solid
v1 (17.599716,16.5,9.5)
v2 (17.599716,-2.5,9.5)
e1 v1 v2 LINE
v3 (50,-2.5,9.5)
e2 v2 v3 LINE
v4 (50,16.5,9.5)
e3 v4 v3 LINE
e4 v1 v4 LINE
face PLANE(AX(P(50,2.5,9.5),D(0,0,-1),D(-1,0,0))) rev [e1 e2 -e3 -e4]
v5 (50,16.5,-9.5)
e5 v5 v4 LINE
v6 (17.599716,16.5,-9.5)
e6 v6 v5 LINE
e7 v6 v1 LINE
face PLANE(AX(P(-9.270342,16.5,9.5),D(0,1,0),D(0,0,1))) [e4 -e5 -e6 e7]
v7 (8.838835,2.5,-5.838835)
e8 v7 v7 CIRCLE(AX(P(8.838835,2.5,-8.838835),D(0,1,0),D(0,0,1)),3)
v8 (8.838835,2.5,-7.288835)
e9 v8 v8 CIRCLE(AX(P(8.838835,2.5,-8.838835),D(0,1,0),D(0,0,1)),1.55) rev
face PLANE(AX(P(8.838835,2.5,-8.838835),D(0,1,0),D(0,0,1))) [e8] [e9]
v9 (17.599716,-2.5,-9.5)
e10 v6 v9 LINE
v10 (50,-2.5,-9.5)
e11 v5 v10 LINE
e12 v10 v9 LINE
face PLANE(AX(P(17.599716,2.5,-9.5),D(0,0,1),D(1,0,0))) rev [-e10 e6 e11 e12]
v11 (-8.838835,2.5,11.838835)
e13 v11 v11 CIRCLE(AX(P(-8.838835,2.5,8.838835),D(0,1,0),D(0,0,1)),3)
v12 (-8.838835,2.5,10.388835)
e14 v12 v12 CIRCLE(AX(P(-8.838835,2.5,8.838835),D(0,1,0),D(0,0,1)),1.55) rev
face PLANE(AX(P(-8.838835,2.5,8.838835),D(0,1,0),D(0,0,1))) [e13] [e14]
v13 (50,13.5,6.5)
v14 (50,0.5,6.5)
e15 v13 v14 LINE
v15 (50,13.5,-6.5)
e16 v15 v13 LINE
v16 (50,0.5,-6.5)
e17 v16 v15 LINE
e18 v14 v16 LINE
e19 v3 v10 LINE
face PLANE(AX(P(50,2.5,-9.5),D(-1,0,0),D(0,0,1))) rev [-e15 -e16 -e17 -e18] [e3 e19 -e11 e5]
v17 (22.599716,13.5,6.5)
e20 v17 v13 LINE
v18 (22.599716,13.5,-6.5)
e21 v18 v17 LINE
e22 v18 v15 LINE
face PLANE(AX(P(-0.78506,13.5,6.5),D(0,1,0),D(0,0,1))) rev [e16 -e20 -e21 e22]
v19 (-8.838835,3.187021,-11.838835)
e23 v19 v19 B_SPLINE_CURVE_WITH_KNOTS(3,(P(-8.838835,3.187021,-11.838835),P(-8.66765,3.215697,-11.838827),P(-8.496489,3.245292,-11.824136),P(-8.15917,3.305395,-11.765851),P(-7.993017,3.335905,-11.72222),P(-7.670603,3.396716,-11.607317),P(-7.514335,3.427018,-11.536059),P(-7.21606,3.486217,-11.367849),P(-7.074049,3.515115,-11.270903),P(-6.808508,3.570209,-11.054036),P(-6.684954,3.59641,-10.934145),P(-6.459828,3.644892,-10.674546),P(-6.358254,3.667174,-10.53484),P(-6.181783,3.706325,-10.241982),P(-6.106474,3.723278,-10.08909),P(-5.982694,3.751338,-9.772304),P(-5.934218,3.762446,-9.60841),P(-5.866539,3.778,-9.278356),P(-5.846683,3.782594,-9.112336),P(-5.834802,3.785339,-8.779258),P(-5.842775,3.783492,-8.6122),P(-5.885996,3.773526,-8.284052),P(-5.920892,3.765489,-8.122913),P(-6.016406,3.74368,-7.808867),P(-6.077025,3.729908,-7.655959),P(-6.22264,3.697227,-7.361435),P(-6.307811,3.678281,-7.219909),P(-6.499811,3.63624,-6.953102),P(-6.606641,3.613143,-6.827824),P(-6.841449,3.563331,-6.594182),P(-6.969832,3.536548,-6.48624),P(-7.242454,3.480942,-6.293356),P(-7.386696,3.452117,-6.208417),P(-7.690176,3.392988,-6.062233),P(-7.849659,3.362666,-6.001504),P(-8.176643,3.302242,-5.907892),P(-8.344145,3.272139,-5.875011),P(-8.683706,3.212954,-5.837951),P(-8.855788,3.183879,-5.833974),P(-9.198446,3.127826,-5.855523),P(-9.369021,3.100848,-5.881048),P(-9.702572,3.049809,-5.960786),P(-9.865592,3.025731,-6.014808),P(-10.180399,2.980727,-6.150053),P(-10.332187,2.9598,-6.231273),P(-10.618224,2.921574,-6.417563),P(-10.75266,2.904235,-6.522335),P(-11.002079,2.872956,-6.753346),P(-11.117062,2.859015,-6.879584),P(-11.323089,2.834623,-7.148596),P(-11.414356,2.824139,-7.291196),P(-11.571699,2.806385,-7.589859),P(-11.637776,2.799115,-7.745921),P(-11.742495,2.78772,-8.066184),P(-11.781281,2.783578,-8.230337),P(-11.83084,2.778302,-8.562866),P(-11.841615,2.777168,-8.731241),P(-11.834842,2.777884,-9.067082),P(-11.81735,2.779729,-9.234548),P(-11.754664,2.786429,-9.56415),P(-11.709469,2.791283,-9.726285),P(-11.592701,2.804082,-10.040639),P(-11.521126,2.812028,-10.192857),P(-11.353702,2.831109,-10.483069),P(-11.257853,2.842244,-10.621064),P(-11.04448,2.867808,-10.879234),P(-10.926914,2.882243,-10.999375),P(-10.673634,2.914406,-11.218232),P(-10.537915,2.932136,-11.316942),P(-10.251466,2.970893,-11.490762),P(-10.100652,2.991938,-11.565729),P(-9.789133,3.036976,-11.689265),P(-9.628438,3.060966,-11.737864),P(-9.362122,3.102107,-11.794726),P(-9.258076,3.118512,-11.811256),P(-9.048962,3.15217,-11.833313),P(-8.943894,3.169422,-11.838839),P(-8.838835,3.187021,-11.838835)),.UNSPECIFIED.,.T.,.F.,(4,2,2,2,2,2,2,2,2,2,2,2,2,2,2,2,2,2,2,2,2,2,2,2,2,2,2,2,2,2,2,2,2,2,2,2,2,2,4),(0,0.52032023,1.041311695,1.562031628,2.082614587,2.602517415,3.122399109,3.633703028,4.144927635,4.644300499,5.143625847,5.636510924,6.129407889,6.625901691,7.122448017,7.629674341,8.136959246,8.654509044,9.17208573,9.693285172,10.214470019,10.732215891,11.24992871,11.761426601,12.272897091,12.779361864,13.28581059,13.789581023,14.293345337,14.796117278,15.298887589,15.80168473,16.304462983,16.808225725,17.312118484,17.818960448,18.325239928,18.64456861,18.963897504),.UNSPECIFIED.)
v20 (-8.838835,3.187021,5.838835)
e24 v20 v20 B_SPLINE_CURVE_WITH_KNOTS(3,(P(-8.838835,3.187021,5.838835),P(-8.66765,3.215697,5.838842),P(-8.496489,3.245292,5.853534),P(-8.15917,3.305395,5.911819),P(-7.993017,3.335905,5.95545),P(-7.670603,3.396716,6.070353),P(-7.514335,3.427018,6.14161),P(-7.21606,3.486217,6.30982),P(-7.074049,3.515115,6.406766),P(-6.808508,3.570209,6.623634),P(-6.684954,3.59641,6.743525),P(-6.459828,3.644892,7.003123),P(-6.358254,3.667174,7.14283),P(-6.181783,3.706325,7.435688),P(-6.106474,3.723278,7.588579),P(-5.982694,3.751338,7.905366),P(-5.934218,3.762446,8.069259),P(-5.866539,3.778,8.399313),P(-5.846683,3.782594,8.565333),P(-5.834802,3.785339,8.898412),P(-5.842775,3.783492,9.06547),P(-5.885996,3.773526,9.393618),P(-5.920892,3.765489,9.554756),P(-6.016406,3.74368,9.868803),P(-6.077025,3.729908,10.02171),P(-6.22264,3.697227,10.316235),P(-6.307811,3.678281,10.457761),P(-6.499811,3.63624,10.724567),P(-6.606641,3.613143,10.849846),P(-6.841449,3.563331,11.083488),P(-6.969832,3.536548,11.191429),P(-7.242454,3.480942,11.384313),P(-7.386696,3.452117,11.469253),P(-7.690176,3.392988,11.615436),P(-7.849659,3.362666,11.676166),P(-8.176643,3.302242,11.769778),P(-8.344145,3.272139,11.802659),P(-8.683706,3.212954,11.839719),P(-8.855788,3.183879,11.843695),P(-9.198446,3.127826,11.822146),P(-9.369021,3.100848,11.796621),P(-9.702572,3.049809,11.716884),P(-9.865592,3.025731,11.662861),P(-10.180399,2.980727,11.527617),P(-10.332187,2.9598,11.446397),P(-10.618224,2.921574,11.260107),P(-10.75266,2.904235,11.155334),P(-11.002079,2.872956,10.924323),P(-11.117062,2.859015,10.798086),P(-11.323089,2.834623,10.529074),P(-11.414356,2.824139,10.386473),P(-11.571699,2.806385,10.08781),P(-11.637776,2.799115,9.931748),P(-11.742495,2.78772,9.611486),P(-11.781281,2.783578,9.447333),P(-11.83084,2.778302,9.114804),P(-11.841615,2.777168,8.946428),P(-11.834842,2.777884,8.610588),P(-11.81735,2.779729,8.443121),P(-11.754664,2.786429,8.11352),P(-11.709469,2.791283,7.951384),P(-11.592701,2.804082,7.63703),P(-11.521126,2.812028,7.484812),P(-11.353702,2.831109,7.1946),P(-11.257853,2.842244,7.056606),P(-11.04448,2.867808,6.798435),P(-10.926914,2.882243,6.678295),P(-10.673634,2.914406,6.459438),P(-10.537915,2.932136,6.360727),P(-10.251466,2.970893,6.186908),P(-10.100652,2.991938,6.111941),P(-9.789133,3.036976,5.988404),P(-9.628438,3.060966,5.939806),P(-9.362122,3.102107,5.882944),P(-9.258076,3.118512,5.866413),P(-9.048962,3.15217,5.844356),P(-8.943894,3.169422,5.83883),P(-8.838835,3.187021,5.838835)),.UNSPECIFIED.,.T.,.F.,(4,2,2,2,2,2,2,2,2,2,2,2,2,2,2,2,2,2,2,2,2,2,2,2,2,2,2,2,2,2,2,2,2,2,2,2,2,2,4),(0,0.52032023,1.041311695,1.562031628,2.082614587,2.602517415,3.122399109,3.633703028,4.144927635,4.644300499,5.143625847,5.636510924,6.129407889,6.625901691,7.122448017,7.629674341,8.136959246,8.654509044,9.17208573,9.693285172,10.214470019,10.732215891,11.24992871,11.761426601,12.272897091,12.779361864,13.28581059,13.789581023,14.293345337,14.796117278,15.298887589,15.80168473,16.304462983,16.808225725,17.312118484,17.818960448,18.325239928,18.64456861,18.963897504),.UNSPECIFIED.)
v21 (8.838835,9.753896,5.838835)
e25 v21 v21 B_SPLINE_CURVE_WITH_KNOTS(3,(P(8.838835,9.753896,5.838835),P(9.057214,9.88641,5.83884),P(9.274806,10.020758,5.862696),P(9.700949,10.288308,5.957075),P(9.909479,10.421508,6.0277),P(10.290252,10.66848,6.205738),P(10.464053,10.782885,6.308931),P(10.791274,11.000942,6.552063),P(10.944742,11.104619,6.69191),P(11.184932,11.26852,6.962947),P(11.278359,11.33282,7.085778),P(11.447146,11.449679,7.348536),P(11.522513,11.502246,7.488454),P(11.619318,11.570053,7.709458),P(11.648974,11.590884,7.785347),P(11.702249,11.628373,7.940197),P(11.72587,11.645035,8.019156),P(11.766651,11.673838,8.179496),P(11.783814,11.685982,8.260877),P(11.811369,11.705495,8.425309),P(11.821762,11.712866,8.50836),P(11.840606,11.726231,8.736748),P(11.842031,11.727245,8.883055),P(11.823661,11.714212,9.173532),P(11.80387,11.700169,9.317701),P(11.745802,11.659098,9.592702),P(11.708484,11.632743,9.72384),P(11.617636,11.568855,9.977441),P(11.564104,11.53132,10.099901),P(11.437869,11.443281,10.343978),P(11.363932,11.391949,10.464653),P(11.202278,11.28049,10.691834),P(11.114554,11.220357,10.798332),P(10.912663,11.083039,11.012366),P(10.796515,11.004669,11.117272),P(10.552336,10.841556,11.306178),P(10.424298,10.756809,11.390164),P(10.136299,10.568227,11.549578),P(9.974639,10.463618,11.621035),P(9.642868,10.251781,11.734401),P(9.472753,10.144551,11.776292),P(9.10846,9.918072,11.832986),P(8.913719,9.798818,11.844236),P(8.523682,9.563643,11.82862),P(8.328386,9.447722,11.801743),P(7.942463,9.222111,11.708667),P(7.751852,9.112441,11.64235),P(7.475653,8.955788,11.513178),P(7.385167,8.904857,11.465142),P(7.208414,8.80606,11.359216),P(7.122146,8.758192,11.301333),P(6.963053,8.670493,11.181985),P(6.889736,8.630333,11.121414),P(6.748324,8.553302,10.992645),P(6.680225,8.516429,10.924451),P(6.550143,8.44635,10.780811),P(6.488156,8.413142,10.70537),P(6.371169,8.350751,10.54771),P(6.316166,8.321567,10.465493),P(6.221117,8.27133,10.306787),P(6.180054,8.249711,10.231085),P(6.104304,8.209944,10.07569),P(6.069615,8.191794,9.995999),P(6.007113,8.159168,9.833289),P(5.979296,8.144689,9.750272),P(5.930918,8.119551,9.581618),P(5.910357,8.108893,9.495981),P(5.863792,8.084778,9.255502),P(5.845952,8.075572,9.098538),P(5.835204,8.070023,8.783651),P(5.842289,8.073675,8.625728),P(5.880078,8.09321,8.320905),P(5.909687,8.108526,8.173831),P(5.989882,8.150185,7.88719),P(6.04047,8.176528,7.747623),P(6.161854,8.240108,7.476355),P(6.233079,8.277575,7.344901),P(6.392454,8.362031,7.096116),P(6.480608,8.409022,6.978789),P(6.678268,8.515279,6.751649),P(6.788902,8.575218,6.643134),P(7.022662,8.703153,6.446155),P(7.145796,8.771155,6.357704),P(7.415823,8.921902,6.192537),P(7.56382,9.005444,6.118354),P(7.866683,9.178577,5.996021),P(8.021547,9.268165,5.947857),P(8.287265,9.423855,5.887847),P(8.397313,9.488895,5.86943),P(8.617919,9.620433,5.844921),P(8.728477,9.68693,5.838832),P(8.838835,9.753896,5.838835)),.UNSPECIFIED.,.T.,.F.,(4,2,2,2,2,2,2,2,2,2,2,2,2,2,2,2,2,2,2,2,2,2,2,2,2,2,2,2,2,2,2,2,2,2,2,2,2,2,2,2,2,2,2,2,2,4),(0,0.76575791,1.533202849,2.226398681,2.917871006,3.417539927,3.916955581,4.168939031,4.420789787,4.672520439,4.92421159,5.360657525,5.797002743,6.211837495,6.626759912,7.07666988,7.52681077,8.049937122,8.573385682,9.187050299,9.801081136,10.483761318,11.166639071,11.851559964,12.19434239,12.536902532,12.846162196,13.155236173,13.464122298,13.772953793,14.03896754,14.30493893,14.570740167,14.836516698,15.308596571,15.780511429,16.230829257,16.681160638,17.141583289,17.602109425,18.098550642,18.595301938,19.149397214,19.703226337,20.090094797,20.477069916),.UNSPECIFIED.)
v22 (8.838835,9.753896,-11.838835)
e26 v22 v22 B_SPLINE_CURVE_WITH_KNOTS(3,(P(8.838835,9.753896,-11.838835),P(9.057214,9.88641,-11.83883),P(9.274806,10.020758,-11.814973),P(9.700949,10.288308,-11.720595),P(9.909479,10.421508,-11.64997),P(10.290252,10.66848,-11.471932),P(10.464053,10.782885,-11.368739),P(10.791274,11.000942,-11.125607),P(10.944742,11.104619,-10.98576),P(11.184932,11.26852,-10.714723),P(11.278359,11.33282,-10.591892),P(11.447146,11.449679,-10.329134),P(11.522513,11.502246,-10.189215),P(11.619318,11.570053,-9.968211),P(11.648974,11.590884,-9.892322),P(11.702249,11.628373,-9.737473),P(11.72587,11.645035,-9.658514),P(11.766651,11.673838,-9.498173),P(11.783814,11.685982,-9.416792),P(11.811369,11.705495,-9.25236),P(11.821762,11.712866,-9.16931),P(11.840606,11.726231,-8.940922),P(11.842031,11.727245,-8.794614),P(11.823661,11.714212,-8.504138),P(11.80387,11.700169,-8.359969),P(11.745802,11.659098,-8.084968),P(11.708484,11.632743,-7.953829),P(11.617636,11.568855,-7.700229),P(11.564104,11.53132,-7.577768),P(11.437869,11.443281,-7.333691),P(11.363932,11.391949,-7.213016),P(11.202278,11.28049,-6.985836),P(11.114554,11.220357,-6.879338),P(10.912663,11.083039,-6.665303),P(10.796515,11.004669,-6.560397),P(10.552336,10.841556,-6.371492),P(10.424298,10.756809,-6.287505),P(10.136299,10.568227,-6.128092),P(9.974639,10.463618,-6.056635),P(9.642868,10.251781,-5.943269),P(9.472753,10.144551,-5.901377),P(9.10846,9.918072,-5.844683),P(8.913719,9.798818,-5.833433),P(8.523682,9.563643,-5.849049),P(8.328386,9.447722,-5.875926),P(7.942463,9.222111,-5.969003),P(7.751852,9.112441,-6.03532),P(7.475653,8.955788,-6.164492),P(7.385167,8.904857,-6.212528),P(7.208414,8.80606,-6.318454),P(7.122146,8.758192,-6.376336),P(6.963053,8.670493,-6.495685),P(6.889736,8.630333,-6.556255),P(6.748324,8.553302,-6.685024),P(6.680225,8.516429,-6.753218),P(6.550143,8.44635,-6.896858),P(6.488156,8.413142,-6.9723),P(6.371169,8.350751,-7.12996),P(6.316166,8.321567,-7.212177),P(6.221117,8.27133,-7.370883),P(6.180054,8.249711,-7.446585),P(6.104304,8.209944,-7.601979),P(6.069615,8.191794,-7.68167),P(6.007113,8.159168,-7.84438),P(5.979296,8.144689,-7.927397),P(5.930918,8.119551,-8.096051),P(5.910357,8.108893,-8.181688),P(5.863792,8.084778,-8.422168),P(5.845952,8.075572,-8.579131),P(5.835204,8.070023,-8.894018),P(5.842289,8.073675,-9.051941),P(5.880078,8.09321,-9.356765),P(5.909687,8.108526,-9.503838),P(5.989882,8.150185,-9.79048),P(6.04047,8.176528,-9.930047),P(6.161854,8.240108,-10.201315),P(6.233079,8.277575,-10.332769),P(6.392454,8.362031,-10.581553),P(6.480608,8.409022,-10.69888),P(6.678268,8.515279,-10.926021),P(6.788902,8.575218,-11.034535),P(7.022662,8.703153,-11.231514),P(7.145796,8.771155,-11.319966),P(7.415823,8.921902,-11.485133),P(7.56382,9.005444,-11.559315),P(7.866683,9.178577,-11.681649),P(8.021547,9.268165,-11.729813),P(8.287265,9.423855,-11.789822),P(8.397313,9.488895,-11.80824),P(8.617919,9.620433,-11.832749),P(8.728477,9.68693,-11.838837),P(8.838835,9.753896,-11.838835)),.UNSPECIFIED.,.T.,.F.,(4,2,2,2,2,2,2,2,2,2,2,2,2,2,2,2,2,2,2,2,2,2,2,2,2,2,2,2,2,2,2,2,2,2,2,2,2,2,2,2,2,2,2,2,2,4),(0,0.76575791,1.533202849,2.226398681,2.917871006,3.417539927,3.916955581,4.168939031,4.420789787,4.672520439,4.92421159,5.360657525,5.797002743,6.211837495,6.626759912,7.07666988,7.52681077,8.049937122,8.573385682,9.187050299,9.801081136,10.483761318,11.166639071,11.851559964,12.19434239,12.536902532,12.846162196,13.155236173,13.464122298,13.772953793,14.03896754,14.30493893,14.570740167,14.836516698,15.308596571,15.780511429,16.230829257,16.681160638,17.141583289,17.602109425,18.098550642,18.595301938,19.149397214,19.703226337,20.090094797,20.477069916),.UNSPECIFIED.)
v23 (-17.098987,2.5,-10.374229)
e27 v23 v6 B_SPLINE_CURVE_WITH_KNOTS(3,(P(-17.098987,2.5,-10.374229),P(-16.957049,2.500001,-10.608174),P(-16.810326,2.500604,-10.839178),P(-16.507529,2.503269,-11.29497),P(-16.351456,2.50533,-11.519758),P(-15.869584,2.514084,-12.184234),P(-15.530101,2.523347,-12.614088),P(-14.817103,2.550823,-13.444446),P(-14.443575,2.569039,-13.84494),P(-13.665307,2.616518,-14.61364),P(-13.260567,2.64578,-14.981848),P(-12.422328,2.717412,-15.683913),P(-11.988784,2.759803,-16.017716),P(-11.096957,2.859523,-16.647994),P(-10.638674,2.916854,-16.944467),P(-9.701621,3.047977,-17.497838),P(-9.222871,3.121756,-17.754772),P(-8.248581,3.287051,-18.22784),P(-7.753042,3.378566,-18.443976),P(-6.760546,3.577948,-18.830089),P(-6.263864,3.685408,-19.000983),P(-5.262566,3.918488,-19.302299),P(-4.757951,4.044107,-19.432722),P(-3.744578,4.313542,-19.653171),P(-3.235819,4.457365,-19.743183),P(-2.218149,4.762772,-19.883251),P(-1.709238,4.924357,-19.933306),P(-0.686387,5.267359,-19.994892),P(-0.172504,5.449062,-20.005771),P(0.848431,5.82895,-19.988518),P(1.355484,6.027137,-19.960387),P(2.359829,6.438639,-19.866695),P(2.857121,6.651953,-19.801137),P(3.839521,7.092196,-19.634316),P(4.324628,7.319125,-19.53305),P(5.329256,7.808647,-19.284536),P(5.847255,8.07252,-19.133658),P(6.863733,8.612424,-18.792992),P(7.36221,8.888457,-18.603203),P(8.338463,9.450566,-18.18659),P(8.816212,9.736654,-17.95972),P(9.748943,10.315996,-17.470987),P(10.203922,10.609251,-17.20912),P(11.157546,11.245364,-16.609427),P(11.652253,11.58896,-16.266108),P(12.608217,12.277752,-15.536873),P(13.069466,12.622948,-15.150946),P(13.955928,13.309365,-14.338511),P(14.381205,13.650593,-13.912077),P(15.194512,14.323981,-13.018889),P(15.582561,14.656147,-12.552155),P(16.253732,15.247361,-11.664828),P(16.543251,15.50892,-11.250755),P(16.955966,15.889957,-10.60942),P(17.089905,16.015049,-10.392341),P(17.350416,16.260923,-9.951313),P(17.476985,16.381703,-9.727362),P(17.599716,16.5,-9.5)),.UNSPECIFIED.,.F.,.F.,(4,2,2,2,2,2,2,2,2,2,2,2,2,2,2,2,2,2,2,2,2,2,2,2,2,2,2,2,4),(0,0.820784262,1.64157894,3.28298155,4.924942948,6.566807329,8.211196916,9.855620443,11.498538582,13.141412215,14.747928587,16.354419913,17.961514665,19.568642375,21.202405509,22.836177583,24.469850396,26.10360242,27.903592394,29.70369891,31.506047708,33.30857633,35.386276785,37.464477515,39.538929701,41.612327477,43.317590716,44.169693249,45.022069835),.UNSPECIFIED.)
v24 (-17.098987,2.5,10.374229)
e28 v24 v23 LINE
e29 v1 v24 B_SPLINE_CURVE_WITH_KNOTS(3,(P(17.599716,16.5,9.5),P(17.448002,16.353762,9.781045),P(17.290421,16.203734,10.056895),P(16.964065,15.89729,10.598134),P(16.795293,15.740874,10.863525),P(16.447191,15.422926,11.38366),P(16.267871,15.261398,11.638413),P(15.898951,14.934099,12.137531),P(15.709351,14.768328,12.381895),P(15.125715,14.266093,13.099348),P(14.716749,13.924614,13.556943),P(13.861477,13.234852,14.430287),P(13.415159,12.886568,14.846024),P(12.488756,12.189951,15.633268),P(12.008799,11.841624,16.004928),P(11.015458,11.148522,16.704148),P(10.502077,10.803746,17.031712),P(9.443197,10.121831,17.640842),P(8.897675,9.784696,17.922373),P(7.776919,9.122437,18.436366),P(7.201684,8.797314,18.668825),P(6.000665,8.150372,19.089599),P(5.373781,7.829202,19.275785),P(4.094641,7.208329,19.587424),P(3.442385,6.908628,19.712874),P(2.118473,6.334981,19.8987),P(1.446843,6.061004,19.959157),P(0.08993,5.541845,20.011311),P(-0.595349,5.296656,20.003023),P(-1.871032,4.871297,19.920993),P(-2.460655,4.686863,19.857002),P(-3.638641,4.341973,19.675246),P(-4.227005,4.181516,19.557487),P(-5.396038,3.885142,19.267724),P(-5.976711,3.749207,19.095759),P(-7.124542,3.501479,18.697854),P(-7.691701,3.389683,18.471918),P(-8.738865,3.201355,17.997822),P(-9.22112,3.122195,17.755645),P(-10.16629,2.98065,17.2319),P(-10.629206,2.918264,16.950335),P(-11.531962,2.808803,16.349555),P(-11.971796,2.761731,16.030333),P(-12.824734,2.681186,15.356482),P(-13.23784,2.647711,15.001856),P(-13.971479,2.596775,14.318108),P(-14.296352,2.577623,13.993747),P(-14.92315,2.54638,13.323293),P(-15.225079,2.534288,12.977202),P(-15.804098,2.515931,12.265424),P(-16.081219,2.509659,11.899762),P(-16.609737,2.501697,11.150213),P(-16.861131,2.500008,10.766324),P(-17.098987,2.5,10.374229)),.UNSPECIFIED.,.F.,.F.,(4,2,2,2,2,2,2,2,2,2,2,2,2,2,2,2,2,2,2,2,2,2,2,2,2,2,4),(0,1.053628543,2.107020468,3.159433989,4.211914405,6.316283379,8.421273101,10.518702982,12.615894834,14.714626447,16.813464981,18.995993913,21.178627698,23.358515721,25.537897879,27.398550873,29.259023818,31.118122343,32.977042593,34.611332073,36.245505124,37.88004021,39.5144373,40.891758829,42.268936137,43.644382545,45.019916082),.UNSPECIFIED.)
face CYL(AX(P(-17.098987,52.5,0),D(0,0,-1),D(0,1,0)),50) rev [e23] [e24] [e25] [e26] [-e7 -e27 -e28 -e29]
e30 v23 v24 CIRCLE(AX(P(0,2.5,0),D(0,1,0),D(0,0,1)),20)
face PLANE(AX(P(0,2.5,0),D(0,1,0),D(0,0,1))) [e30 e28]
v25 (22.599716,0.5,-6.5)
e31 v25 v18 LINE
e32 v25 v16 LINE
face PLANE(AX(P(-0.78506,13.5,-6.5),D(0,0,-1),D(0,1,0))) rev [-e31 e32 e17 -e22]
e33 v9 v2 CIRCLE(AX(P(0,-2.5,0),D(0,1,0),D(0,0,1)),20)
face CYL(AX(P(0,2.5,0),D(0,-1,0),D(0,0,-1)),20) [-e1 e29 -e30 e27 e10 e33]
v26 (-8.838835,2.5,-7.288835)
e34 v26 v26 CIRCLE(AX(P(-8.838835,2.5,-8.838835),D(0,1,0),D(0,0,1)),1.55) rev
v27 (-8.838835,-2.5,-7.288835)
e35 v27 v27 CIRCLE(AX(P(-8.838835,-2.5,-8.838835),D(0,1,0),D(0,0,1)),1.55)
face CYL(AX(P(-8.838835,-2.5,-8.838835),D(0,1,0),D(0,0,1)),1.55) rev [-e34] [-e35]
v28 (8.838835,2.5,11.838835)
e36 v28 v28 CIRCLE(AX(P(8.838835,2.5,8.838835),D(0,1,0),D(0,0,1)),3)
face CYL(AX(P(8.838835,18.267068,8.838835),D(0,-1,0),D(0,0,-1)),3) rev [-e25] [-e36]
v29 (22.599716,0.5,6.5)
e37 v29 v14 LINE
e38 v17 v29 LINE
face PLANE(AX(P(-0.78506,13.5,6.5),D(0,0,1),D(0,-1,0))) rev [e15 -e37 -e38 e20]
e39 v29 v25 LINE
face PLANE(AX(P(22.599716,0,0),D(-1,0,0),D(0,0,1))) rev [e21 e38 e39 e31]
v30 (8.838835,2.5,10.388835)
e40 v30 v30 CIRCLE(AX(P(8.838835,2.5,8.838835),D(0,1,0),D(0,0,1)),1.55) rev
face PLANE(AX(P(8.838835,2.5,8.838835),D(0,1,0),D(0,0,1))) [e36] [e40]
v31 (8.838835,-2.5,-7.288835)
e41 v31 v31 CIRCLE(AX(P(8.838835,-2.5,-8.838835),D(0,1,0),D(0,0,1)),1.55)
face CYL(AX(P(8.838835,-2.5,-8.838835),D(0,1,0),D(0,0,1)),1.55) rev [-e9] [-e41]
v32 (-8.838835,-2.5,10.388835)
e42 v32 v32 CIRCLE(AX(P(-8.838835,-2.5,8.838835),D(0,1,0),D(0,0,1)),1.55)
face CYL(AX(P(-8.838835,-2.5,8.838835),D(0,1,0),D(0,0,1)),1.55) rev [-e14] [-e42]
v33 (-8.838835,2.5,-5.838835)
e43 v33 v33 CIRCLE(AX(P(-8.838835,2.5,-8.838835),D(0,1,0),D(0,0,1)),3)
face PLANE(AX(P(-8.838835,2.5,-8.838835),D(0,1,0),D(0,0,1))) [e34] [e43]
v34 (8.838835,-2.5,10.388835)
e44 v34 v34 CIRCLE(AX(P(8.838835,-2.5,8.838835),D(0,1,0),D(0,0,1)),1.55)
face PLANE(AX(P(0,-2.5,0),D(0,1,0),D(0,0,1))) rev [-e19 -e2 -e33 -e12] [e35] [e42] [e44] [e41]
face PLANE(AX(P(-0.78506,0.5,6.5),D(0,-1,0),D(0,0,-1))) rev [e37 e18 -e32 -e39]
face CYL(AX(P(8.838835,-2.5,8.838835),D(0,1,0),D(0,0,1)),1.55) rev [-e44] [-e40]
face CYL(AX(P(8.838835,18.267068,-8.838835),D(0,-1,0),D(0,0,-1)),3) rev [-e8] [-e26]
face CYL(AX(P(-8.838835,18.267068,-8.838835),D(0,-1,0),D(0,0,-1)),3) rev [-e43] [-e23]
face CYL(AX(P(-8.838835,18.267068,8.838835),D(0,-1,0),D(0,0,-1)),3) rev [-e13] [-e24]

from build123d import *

# Parameters (mm, degrees)
BOSS_EXTRUDE1_DEPTH     = 2.5
SKETCH2_R               = 1.55
CUT_EXTRUDE1_DEPTH      = 2.5
SKETCH6_W               = 19
SKETCH6_H               = 19
BOSS_EXTRUDE3_DEPTH     = 32.400284093
SKETCH8_W               = 13
SKETCH8_H               = 13
CUT_EXTRUDE2_DEPTH      = 27.400284093
FILLET2_R               = 50
CUT_EXTRUDE4_REACH      = 57.642
CUT_EXTRUDE4_END_RADIUS = 50
SKETCH13_R              = 3


with BuildPart() as part:
    # Sketch1 → Boss-Extrude1 (new, symmetric)
    with BuildSketch(Plane(origin=(0, 0, 0), x_dir=(1, 0, 0), z_dir=(0, 1, 0))):
        with BuildLine():
            Line((17.599715907, 9.5), (50, 9.5))
            Line((50, 9.5), (50, -9.5))
            Line((50, -9.5), (17.599715907, -9.5))
            ThreePointArc((17.599715907, -9.5), (-20, 0), (17.599715907, 9.5))
        make_face()
    extrude(amount=BOSS_EXTRUDE1_DEPTH, both=True)

    # Sketch2 → Cut-Extrude1 (cut, symmetric)
    with BuildSketch(Plane(origin=(0, 0, 0), x_dir=(1, 0, 0), z_dir=(0, 1, 0))):
        with Locations(Location((8.838834765, 8.838834765, 0), (0, 0, 270))):
            Circle(SKETCH2_R)
        with Locations(Location((-8.838834765, 8.838834765, 0), (0, 0, 270))):
            Circle(SKETCH2_R)
        with Locations(Location((-8.838834765, -8.838834765, 0), (0, 0, 270))):
            Circle(SKETCH2_R)
        with Locations(Location((8.838834765, -8.838834765, 0), (0, 0, 270))):
            Circle(SKETCH2_R)
    extrude(amount=CUT_EXTRUDE1_DEPTH, both=True, mode=Mode.SUBTRACT)

    # Sketch6 → Boss-Extrude3 (add)
    with BuildSketch(Plane(origin=(50, 0, 0), x_dir=(0, 0, -1), z_dir=(1, 0, 0))):
        with Locations((0, 7)):
            Rectangle(SKETCH6_W, SKETCH6_H)
    extrude(amount=-BOSS_EXTRUDE3_DEPTH)

    # Sketch8 → Cut-Extrude2 (cut)
    with BuildSketch(Plane(origin=(50, 0, 0), x_dir=(0, 0, -1), z_dir=(1, 0, 0))):
        with Locations((0, 7)):
            Rectangle(SKETCH8_W, SKETCH8_H)
    extrude(amount=-CUT_EXTRUDE2_DEPTH, mode=Mode.SUBTRACT)

    # Fillet2
    # the kernel refuses this fillet: 50 mm, written as the material it adds along each edge
    with BuildSketch(Plane(origin=(17.599715907, 2.5, -96.246757864), x_dir=(-1, 0, 0), z_dir=(0, 0, 1))) as fillet2_piece_1_section:
        with BuildLine():
            CenterArc((34.698703146, -50), FILLET2_R, 90, 43.945519562)
            Line((0, -14), (0, 0))
            Line((0, 0), (34.698703146, 0))
        make_face()
    fillet2_piece_1 = extrude(amount=192.493515729, mode=Mode.PRIVATE)
    fillet2_piece_1 = fillet2_piece_1 & Plane(origin=(0, 2.5, 0), x_dir=(0.8799857953399021, 0, 0.47500000000000003), z_dir=(0, 1, 0)) * Cylinder(20, 524, mode=Mode.PRIVATE)
    fillet2_piece_1 = fillet2_piece_1 - Plane(origin=(8.838834765, 2.5, 8.838834765), x_dir=(0, 0, 1), z_dir=(0, 1, 0)) * Cylinder(1.55, 524, mode=Mode.PRIVATE)
    fillet2_piece_1 = fillet2_piece_1 - Plane(origin=(-8.838834765, 2.5, 8.838834765), x_dir=(0, 0, 1), z_dir=(0, 1, 0)) * Cylinder(1.55, 524, mode=Mode.PRIVATE)
    fillet2_piece_1 = fillet2_piece_1 - Plane(origin=(8.838834765, 2.5, -8.838834765), x_dir=(0, 0, 1), z_dir=(0, 1, 0)) * Cylinder(1.55, 524, mode=Mode.PRIVATE)
    fillet2_piece_1 = fillet2_piece_1 - Plane(origin=(-8.838834765, 2.5, -8.838834765), x_dir=(0, 0, 1), z_dir=(0, 1, 0)) * Cylinder(1.55, 524, mode=Mode.PRIVATE)
    add(fillet2_piece_1)

    # Cut-Extrude4: up to this cylinder (the profile starts outside it)
    cut_extrude4_end = Plane(origin=(-17.098987239, 52.5, 0), z_dir=(0, 0, -1)) * Cylinder(CUT_EXTRUDE4_END_RADIUS, 233.96167, mode=Mode.PRIVATE)
    # Sketch13 → Cut-Extrude4 (cut, up to the surface)
    with BuildSketch(Plane(origin=(0, 2.5, 0), x_dir=(1, 0, 0), z_dir=(0, 1, 0)), mode=Mode.PRIVATE) as cut_extrude4_sk1:
        with Locations(Location((-8.838834765, 8.838834765, 0), (0, 0, 90))):
            Circle(SKETCH13_R)
    cut_extrude4_tool1 = extrude(cut_extrude4_sk1.sketch, amount=CUT_EXTRUDE4_REACH, mode=Mode.PRIVATE) - cut_extrude4_end
    add(cut_extrude4_tool1.solids().sort_by_distance((-8.838835, 2.5, -8.838835))[0], mode=Mode.SUBTRACT)
    # Sketch13 → Cut-Extrude4 (cut, up to the surface)
    with BuildSketch(Plane(origin=(0, 2.5, 0), x_dir=(1, 0, 0), z_dir=(0, 1, 0)), mode=Mode.PRIVATE) as cut_extrude4_sk2:
        with Locations(Location((8.838834765, 8.838834765, 0), (0, 0, 90))):
            Circle(SKETCH13_R)
    cut_extrude4_tool2 = extrude(cut_extrude4_sk2.sketch, amount=CUT_EXTRUDE4_REACH, mode=Mode.PRIVATE) - cut_extrude4_end
    add(cut_extrude4_tool2.solids().sort_by_distance((8.838835, 2.5, -8.838835))[0], mode=Mode.SUBTRACT)
    # Sketch13 → Cut-Extrude4 (cut, up to the surface)
    with BuildSketch(Plane(origin=(0, 2.5, 0), x_dir=(1, 0, 0), z_dir=(0, 1, 0)), mode=Mode.PRIVATE) as cut_extrude4_sk3:
        with Locations(Location((-8.838834765, -8.838834765, 0), (0, 0, 90))):
            Circle(SKETCH13_R)
    cut_extrude4_tool3 = extrude(cut_extrude4_sk3.sketch, amount=CUT_EXTRUDE4_REACH, mode=Mode.PRIVATE) - cut_extrude4_end
    add(cut_extrude4_tool3.solids().sort_by_distance((-8.838835, 2.5, 8.838835))[0], mode=Mode.SUBTRACT)
    # Sketch13 → Cut-Extrude4 (cut, up to the surface)
    with BuildSketch(Plane(origin=(0, 2.5, 0), x_dir=(1, 0, 0), z_dir=(0, 1, 0)), mode=Mode.PRIVATE) as cut_extrude4_sk4:
        with Locations(Location((8.838834765, -8.838834765, 0), (0, 0, 90))):
            Circle(SKETCH13_R)
    cut_extrude4_tool4 = extrude(cut_extrude4_sk4.sketch, amount=CUT_EXTRUDE4_REACH, mode=Mode.PRIVATE) - cut_extrude4_end
    add(cut_extrude4_tool4.solids().sort_by_distance((8.838835, 2.5, 8.838835))[0], mode=Mode.SUBTRACT)


solid = part.part
